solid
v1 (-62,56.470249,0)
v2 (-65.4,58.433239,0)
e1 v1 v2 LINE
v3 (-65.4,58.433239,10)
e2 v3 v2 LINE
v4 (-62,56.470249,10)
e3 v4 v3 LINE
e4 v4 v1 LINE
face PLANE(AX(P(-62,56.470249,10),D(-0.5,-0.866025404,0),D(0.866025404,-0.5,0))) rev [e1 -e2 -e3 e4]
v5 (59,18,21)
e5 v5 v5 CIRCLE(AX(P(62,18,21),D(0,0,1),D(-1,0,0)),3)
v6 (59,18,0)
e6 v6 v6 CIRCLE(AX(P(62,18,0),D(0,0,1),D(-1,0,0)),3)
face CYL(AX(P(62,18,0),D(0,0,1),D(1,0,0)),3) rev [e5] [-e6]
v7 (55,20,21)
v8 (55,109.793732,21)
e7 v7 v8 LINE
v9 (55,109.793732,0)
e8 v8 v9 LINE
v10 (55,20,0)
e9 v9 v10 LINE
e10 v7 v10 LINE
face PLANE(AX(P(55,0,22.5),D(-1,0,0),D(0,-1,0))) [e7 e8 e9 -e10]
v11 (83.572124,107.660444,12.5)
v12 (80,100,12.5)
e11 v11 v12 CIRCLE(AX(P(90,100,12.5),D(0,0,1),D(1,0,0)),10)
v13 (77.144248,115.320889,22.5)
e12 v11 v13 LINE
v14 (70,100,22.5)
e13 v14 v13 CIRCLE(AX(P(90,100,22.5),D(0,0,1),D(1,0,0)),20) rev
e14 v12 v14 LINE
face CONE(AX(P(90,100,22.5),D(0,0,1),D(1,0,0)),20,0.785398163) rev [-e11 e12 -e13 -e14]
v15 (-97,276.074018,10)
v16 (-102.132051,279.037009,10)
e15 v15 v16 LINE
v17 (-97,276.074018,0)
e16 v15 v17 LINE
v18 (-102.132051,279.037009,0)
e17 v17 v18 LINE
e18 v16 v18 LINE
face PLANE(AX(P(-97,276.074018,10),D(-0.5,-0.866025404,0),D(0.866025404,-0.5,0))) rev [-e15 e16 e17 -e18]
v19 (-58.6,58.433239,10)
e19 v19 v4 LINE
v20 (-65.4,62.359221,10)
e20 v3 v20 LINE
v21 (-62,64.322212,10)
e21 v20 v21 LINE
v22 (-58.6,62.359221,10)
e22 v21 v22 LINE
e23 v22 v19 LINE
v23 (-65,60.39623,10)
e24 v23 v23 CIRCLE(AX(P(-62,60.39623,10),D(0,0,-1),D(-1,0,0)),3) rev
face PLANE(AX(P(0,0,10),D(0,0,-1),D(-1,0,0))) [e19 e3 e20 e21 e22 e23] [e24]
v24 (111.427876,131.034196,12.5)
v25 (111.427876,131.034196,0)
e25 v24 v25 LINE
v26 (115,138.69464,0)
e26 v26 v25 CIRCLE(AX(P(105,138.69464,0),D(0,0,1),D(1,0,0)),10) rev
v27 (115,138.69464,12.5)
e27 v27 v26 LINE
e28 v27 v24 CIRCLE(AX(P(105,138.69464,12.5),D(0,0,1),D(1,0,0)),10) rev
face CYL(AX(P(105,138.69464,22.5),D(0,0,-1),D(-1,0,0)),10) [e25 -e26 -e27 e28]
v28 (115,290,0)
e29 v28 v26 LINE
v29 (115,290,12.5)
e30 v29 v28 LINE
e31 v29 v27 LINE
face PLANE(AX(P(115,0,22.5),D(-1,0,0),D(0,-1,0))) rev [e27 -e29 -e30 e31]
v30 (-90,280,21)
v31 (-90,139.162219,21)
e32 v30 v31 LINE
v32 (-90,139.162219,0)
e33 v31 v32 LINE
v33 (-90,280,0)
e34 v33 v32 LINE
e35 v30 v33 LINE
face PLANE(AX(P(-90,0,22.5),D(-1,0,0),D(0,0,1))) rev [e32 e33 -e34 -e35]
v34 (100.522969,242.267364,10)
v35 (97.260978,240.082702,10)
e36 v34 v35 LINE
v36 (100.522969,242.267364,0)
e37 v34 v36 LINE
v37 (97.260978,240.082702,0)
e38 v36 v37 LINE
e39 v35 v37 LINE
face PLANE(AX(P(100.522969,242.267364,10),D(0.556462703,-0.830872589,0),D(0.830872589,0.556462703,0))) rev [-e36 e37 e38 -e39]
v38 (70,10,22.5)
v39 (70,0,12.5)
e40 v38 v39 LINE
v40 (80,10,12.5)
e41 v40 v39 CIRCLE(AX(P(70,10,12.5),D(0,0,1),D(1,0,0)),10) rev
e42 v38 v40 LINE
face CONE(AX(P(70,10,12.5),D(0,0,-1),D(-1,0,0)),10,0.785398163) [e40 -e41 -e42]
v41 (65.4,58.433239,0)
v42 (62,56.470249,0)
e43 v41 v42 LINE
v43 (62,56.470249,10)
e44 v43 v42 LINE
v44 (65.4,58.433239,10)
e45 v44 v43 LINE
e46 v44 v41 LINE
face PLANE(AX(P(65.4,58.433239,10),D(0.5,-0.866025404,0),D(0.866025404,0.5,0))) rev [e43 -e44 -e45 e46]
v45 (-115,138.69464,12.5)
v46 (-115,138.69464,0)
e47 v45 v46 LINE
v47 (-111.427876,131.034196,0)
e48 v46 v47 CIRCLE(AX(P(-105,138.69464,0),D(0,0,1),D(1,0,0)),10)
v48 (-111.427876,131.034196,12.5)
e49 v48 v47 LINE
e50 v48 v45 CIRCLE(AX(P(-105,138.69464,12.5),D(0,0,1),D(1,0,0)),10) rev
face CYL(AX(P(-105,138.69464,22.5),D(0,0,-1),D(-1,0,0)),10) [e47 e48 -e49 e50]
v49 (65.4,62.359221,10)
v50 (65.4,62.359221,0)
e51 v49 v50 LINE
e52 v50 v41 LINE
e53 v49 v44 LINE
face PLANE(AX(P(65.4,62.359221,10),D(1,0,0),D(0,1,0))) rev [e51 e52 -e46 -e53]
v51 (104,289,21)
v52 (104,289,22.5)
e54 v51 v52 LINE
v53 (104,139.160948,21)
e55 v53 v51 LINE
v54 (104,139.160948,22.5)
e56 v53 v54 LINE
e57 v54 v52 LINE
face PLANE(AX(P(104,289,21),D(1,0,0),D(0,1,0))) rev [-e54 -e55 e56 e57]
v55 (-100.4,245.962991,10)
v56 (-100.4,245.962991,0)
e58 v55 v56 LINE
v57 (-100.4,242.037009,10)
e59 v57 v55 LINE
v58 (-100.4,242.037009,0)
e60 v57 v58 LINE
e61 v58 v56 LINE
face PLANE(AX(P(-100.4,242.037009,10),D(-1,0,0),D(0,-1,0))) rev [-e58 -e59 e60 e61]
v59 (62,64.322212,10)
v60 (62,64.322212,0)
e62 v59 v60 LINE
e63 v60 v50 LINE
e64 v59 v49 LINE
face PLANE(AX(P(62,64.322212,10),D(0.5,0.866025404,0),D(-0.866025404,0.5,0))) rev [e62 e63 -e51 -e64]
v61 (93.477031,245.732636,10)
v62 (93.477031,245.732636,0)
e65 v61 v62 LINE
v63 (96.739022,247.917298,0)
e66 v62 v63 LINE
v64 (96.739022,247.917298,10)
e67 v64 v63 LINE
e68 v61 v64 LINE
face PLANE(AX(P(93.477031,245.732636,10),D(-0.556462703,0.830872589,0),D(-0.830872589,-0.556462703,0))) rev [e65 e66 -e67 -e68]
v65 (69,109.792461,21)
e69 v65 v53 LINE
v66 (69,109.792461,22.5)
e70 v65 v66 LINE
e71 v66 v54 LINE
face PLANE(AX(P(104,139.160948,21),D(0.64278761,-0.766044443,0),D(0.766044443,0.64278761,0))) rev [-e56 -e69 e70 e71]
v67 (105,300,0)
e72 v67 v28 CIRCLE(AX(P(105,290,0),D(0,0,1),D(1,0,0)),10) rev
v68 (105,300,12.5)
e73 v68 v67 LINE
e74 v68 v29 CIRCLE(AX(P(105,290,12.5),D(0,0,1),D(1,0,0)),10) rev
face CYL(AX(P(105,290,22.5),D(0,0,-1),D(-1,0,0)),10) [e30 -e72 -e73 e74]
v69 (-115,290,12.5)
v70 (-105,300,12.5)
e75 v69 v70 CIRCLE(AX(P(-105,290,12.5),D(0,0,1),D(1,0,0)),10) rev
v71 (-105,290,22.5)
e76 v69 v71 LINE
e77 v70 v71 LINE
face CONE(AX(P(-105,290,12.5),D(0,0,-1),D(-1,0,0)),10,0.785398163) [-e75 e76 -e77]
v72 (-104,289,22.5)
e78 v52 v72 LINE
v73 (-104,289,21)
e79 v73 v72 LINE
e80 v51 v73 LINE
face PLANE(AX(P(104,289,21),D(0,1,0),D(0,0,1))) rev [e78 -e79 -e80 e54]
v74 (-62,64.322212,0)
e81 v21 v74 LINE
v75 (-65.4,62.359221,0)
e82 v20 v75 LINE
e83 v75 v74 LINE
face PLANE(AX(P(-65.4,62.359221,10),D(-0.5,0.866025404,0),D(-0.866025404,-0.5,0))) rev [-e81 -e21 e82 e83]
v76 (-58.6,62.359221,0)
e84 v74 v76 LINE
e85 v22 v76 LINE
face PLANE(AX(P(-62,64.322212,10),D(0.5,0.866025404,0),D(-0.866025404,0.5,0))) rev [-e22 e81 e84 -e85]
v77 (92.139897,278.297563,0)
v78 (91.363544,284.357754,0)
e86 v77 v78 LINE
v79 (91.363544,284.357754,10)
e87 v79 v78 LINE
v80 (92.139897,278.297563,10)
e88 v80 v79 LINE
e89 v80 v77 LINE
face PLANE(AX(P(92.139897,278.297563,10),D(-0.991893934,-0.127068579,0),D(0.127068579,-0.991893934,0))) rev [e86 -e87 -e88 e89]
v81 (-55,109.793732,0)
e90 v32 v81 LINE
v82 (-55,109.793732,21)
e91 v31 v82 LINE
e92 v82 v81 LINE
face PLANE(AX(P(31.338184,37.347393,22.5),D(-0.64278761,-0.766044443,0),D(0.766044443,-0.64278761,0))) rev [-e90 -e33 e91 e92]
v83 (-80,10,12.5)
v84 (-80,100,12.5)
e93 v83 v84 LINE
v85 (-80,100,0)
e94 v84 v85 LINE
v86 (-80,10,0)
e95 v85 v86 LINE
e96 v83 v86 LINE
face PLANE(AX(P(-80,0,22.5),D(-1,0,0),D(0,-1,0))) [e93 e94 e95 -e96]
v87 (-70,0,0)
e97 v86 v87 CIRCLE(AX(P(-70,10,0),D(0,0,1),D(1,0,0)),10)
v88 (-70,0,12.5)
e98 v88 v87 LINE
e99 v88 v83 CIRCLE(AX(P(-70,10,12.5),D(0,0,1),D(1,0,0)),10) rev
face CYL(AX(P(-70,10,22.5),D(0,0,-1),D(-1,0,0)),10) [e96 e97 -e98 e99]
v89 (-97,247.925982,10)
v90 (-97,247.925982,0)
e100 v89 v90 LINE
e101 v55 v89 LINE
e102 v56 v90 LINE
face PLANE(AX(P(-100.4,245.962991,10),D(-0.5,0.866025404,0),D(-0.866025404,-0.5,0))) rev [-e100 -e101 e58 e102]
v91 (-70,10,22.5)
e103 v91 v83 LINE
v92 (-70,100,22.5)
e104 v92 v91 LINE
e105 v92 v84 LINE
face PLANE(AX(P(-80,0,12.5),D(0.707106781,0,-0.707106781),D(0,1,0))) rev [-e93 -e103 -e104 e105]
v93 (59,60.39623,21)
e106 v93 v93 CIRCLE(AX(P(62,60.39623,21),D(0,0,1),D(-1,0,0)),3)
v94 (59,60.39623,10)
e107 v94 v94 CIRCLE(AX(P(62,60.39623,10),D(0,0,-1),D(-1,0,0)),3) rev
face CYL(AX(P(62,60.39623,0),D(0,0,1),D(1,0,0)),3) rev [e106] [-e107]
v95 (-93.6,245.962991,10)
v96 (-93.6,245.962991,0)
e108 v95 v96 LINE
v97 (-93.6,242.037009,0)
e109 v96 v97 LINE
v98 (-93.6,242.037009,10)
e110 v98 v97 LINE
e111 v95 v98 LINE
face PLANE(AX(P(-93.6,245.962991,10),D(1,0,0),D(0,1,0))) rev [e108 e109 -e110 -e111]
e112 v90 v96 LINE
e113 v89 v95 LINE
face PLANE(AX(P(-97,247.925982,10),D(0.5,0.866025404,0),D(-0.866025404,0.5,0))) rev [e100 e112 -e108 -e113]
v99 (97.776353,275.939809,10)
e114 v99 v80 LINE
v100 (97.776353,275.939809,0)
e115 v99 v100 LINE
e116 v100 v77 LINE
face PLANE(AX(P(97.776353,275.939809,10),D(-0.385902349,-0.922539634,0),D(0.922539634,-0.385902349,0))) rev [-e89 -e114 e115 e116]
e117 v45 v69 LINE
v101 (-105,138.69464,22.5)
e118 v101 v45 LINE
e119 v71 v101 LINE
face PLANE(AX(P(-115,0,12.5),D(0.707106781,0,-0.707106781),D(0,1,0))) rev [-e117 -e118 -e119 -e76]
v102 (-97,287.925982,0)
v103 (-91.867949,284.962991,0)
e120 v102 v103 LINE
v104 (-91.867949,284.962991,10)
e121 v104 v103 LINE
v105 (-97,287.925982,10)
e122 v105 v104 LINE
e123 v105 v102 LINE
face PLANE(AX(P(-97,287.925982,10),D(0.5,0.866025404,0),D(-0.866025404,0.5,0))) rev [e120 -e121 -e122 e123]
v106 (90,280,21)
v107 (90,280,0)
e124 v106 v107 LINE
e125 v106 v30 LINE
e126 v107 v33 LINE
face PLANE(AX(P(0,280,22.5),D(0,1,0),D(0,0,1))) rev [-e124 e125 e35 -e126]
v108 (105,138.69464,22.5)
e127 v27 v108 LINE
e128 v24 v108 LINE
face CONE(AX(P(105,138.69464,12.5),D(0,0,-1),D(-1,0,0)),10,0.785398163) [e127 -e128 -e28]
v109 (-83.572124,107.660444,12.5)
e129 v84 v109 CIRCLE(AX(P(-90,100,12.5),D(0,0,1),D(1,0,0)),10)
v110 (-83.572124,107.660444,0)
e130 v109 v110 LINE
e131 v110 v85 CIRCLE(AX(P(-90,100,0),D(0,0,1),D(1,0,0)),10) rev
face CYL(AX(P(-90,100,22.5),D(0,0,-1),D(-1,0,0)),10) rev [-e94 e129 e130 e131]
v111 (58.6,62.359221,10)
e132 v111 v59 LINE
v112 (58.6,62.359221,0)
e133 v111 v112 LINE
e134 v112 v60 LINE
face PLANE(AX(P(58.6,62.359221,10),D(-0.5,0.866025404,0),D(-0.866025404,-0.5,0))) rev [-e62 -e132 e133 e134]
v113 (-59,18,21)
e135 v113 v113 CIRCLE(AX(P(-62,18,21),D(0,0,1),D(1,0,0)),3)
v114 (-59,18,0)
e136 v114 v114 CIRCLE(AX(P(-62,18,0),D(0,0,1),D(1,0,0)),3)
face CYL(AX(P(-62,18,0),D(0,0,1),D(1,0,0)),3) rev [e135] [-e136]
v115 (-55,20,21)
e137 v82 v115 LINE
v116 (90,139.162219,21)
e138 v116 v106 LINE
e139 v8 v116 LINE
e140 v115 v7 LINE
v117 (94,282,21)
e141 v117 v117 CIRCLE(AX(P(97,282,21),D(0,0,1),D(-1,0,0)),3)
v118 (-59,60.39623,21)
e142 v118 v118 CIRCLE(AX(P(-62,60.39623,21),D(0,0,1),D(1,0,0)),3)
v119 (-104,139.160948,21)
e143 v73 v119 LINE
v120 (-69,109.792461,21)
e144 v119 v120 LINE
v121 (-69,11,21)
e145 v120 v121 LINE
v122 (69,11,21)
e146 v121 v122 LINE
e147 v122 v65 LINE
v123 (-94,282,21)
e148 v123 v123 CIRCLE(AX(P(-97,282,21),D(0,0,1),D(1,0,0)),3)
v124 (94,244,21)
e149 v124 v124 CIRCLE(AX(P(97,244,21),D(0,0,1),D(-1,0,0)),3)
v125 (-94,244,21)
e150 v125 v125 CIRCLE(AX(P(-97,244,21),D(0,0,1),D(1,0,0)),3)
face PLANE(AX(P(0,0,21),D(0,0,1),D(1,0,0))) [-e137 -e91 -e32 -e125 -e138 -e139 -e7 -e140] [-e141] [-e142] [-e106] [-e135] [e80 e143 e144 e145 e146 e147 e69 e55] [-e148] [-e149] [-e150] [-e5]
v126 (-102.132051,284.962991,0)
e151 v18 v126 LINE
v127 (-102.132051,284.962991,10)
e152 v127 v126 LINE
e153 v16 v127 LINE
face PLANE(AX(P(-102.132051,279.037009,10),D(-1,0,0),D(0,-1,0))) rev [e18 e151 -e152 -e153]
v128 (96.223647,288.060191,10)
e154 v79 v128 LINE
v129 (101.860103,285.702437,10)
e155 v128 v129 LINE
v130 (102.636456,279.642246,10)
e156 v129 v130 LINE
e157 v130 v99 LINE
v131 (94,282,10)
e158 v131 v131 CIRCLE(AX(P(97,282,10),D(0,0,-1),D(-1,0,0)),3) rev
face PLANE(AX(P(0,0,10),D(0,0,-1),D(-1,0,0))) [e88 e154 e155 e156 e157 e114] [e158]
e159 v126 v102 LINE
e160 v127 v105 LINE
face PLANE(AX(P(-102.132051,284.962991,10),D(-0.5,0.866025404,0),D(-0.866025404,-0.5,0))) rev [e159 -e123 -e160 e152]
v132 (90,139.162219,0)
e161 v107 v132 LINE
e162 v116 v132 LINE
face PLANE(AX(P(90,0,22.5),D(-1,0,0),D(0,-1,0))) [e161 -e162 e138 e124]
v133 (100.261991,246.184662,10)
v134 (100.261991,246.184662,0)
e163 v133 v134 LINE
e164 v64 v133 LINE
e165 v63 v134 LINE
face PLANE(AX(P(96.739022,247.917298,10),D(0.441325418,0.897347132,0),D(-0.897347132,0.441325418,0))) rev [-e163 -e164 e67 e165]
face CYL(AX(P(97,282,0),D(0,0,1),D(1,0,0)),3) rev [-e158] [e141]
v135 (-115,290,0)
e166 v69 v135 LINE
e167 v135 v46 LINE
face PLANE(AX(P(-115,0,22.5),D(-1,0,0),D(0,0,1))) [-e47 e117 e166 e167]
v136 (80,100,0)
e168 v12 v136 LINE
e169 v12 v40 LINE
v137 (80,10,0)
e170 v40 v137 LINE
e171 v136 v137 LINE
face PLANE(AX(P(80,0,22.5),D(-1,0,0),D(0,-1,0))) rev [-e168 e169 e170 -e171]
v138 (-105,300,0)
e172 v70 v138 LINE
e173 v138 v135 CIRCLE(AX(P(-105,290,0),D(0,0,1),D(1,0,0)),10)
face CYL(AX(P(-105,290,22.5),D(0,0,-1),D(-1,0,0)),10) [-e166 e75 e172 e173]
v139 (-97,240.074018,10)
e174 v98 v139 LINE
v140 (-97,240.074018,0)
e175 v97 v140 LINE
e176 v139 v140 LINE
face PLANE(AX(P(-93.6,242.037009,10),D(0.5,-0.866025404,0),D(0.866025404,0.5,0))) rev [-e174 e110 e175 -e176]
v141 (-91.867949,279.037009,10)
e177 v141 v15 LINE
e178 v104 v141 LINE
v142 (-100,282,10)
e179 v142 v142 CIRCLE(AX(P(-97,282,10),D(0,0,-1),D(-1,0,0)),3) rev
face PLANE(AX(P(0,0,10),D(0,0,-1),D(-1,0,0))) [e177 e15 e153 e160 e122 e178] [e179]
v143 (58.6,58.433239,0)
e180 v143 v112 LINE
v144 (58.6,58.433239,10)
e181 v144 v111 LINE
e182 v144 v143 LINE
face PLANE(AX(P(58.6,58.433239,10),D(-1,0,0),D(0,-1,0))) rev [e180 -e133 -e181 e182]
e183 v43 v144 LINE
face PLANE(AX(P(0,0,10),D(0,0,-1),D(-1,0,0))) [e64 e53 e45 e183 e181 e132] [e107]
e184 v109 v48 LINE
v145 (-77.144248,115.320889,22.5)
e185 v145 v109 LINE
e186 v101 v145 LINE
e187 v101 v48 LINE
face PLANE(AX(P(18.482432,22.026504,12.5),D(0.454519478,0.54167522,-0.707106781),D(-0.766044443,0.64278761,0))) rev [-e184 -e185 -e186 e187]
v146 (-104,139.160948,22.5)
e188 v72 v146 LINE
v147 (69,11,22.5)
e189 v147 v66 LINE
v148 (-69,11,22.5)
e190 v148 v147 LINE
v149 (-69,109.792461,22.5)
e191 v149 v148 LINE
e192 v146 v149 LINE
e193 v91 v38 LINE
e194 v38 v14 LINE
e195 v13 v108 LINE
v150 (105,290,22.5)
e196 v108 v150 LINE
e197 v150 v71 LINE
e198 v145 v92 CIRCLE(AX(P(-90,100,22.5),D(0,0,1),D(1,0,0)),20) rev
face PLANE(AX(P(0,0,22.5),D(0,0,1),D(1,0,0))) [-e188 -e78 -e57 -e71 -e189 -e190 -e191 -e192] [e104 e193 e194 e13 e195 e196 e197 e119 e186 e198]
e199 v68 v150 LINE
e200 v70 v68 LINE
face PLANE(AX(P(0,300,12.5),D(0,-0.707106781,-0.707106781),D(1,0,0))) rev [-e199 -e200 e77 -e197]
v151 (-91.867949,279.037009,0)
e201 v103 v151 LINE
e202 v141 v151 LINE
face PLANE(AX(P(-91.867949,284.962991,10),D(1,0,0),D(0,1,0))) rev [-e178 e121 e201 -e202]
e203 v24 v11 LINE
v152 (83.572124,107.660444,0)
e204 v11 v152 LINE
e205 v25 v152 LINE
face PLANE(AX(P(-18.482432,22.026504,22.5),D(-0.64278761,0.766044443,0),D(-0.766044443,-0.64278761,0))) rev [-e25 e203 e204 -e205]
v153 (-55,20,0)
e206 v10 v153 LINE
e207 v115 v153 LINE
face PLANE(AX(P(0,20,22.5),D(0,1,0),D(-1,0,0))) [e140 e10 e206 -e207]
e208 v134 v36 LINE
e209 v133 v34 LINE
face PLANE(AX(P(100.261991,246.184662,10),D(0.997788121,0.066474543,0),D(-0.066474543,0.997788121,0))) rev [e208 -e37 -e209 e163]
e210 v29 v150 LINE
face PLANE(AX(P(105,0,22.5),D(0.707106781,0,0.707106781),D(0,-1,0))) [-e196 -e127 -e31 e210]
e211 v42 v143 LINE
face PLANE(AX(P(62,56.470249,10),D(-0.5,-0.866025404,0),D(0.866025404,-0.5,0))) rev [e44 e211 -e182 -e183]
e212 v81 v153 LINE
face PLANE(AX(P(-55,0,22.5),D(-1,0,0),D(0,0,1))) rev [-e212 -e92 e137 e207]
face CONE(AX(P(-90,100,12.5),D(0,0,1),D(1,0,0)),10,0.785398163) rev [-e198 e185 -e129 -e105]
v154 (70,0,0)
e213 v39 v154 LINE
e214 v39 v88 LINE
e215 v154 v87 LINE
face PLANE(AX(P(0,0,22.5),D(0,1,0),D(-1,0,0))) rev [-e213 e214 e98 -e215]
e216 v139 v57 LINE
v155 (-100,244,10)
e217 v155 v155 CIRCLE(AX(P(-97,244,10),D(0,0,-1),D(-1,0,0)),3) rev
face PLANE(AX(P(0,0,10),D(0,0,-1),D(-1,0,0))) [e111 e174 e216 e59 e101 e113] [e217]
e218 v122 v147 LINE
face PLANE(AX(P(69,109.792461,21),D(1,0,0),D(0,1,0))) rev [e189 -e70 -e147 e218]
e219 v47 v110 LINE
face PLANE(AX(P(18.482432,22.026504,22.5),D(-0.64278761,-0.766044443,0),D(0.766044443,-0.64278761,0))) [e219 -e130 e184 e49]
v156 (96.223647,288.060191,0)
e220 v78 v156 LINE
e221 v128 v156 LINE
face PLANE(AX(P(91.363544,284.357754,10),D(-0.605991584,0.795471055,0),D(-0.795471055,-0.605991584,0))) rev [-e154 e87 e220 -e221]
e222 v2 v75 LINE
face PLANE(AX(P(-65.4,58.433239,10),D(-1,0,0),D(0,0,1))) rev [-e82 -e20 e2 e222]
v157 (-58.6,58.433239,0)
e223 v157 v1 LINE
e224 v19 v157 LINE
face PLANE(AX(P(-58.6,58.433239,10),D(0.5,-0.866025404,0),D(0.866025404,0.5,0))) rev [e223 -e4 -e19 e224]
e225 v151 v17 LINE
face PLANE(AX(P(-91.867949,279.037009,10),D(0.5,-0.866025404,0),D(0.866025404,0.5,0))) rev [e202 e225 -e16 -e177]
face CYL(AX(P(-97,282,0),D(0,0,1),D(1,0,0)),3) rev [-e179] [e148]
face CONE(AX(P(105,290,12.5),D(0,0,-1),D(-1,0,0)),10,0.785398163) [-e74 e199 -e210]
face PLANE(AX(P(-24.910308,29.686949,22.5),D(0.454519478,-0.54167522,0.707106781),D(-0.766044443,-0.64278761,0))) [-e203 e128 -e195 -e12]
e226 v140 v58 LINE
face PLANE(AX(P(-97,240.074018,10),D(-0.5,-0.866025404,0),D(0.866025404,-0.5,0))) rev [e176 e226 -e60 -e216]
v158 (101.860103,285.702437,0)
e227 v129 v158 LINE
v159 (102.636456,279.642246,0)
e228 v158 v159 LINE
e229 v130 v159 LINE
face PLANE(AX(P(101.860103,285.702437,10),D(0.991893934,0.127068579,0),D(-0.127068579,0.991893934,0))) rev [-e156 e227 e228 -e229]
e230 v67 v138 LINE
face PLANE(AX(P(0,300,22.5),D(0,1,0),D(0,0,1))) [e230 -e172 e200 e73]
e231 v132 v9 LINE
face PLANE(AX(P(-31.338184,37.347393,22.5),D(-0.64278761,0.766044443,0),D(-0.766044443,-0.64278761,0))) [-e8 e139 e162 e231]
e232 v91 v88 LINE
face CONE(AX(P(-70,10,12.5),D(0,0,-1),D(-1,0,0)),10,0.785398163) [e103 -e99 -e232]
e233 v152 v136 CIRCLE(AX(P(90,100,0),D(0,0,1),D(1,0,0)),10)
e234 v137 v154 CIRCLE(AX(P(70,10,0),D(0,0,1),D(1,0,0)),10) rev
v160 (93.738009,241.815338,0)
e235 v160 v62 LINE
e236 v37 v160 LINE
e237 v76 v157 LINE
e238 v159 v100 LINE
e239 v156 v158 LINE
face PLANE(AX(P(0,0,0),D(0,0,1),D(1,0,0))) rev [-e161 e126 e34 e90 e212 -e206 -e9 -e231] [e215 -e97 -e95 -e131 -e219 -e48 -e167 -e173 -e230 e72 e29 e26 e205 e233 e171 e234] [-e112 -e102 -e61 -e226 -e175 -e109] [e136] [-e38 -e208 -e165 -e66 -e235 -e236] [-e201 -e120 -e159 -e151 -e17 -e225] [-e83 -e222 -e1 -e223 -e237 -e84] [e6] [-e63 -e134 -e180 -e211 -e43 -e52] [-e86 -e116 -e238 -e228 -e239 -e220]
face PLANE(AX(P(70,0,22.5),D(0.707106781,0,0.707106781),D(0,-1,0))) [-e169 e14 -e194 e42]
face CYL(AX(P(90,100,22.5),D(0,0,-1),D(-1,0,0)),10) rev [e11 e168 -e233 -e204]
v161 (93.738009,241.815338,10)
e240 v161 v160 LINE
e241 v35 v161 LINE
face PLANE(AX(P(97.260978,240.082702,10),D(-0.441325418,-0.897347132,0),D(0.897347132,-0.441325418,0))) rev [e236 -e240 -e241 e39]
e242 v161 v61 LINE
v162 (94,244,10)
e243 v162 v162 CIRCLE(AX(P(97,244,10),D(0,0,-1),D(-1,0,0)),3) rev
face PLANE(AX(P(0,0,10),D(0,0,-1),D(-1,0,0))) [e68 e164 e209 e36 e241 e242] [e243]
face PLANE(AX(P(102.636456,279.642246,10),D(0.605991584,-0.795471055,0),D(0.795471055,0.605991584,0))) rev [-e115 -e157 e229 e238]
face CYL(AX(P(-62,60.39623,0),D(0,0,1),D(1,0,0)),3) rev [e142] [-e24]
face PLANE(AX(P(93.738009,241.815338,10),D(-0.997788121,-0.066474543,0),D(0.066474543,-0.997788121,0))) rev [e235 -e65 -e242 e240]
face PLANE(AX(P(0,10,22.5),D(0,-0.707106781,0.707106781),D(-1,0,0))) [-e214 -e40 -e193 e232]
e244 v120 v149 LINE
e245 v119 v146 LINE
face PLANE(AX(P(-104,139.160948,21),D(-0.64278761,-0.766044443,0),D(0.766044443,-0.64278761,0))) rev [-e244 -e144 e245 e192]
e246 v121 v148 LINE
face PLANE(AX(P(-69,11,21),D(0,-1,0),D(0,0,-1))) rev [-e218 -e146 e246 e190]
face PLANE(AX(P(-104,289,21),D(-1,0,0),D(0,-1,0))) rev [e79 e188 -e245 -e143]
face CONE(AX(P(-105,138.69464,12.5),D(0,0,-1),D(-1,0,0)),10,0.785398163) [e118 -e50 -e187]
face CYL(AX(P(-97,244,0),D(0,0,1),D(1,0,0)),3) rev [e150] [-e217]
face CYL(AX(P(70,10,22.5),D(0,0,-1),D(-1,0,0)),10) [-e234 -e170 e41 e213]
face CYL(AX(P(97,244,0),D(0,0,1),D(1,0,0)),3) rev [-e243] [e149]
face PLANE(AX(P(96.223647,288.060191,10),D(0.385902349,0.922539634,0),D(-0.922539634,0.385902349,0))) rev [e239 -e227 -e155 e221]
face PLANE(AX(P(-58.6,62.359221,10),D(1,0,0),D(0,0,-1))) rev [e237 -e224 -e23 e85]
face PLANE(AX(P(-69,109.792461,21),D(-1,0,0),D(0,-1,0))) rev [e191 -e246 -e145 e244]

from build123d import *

# Parameters (mm, degrees)
RESSALTO_EXTRUS_O1_DEPTH = 22.5
CHANFRO1_SIZE            = 10
CORTE_EXTRUS_O1_REACH    = 324.073
ESBO_O3_W                = 1139.230904301
ESBO_O3_H                = 709.798033895
CORTE_EXTRUS_O5_DEPTH    = 1.5
ESBO_O5_R                = 3
CORTE_EXTRUS_O6_DEPTH    = 322.972048476
CORTE_EXTRUS_O8_DEPTH    = 10


with BuildPart() as part:
    # Esboço1 → Ressalto-extrusão1 (new, symmetric)
    with BuildSketch(Plane.XY):
        with BuildLine():
            Line((-70, 0), (70, 0))
            ThreePointArc((70, 0), (77.071067812, 2.928932188), (80, 10))
            Line((80, 10), (80, 100))
            ThreePointArc((80, 100), (80.93692213, 104.226182617), (83.572123903, 107.660444431))
            Line((83.572123903, 107.660444431), (111.427876097, 131.034195823))
            ThreePointArc((111.427876097, 131.034195823), (114.06307787, 134.468457637), (115, 138.694640254))
            Line((115, 138.694640254), (115, 290))
            ThreePointArc((115, 290), (112.071067812, 297.071067812), (105, 300))
            Line((105, 300), (-105, 300))
            ThreePointArc((-105, 300), (-112.071067812, 297.071067812), (-115, 290))
            Line((-115, 290), (-115, 138.694640254))
            ThreePointArc((-115, 138.694640254), (-114.06307787, 134.468457637), (-111.427876097, 131.034195823))
            Line((-111.427876097, 131.034195823), (-83.572123903, 107.660444431))
            ThreePointArc((-83.572123903, 107.660444431), (-80.93692213, 104.226182617), (-80, 100))
            Line((-80, 100), (-80, 10))
            ThreePointArc((-80, 10), (-77.071067812, 2.928932188), (-70, 0))
        make_face()
        Polygon((-55, 20), (55, 20), (55, 109.793731589), (90, 139.16221868), (90, 280), (-90, 280), (-90, 139.16221868), (-55, 109.793731589), align=None, mode=Mode.SUBTRACT)
    extrude(amount=RESSALTO_EXTRUS_O1_DEPTH, both=True)

    # Chanfro1
    chanfro1_edges = [part.edges().sort_by_distance(p)[0] for p in [
        (114.06307787, 134.468457637, 22.5),
        (115, 214.347320127, 22.5),
        (115, 214.347320127, -22.5),
        (114.06307787, 134.468457637, -22.5),
        (97.5, 119.347320127, -22.5),
        (80.93692213, 104.226182617, -22.5),
        (80, 55, -22.5),
        (77.071067812, 2.928932188, -22.5),
        (0, 0, -22.5),
        (-77.071067812, 2.928932188, -22.5),
        (-80, 55, -22.5),
        (-80.93692213, 104.226182617, -22.5),
        (-97.5, 119.347320127, -22.5),
        (-114.06307787, 134.468457637, -22.5),
        (-115, 214.347320127, -22.5),
        (-112.071067812, 297.071067812, -22.5),
        (0, 300, -22.5),
        (112.071067812, 297.071067812, -22.5),
        (112.071067812, 297.071067812, 22.5),
        (0, 300, 22.5),
        (-112.071067812, 297.071067812, 22.5),
        (-115, 214.347320127, 22.5),
        (-114.06307787, 134.468457637, 22.5),
        (-97.5, 119.347320127, 22.5),
        (-80.93692213, 104.226182617, 22.5),
        (-80, 55, 22.5),
        (-77.071067812, 2.928932188, 22.5),
        (0, 0, 22.5),
        (77.071067812, 2.928932188, 22.5),
        (80, 55, 22.5),
        (80.93692213, 104.226182617, 22.5),
        (97.5, 119.347320127, 22.5),
    ]]
    chamfer(chanfro1_edges, length=CHANFRO1_SIZE - 0.0001)  # a hair under: the kernel refuses the full size

    # Esboço3 → Corte-extrusão1 (cut, up to next)
    with BuildSketch(Plane.XY, mode=Mode.PRIVATE) as corte_extrus_o1_sk1:
        with Locations((-153.157436203, 152.53565808)):
            Rectangle(ESBO_O3_W, ESBO_O3_H)
    corte_extrus_o1_tool1 = extrude(corte_extrus_o1_sk1.sketch, amount=-CORTE_EXTRUS_O1_REACH, mode=Mode.PRIVATE) & part.part
    add(corte_extrus_o1_tool1.solids().sort_by_distance((-153.157436, 152.535658, 0))[0], mode=Mode.SUBTRACT)

    # Esboço4 → Corte-extrusão5 (cut)
    with BuildSketch(Plane.XY.offset(22.5)):
        Polygon((104, 289), (-104, 289), (-104, 139.160947912), (-69, 109.792460821), (-69, 11), (69, 11), (69, 109.792460821), (104, 139.160947912), align=None)
        Polygon((-90, 280), (-90, 139.16221868), (-55, 109.793731589), (-55, 20), (0, 20), (55, 20), (55, 109.793731589), (90, 139.16221868), (90, 280), align=None, mode=Mode.SUBTRACT)
    extrude(amount=-CORTE_EXTRUS_O5_DEPTH, mode=Mode.SUBTRACT)

    # Esboço5 → Corte-extrusão6 (cut, through all)
    with BuildSketch(Plane.XY.offset(21)):
        with Locations((-97, 244)):
            Circle(ESBO_O5_R)
        with Locations((-62, 60.396230411)):
            Circle(ESBO_O5_R)
        with Locations((-97, 282)):
            Circle(ESBO_O5_R)
        with Locations((-62, 18)):
            Circle(ESBO_O5_R)
        with Locations(Location((62, 18, 0), (0, 0, 180))):
            Circle(ESBO_O5_R)
        with Locations(Location((97, 282, 0), (0, 0, 180))):
            Circle(ESBO_O5_R)
        with Locations(Location((62, 60.396230411, 0), (0, 0, 180))):
            Circle(ESBO_O5_R)
        with Locations(Location((97, 244, 0), (0, 0, 180))):
            Circle(ESBO_O5_R)
    extrude(amount=-CORTE_EXTRUS_O6_DEPTH, mode=Mode.SUBTRACT)

    # Esboço7 → Corte-extrusão8 (cut)
    with BuildSketch(Plane(origin=(0, 0, 0), x_dir=(-1, 0, 0), z_dir=(0, 0, -1))):
        Polygon((-96.223646947, 288.060191195), (-101.860103, 285.702437064), (-102.636456053, 279.642245869), (-97.776353053, 275.939808805), (-92.139897, 278.297562936), (-91.363543947, 284.357754131), align=None)
        Polygon((-96.739022153, 247.917298035), (-100.261990689, 246.184662463), (-100.522968536, 242.267364427), (-97.260977847, 240.082701965), (-93.738009311, 241.815337537), (-93.477031464, 245.732635573), align=None)
        Polygon((-62, 64.322212241), (-65.4, 62.359221326), (-65.4, 58.433239495), (-62, 56.47024858), (-58.6, 58.433239495), (-58.6, 62.359221326), align=None)
        Polygon((-62, 19.92598183), (-63.667949192, 18.962990915), (-63.667949192, 17.037009085), (-62, 16.07401817), (-60.332050808, 17.037009085), (-60.332050808, 18.962990915), align=None)
        Polygon((62.727937948, 19.561318936), (61.011827112, 19.411072223), (60.283889164, 17.849753287), (61.272062052, 16.438681064), (62.988172888, 16.588927777), (63.716110836, 18.150246713), align=None)
        Polygon((62, 64.322212241), (58.6, 62.359221326), (58.6, 58.433239495), (62, 56.47024858), (65.4, 58.433239495), (65.4, 62.359221326), align=None)
        Polygon((97, 247.92598183), (93.6, 245.962990915), (93.6, 242.037009085), (97, 240.07401817), (100.4, 242.037009085), (100.4, 245.962990915), align=None)
        Polygon((97, 287.92598183), (91.867949192, 284.962990915), (91.867949192, 279.037009085), (97, 276.07401817), (102.132050808, 279.037009085), (102.132050808, 284.962990915), align=None)
    extrude(amount=-CORTE_EXTRUS_O8_DEPTH, mode=Mode.SUBTRACT)


solid = part.part
